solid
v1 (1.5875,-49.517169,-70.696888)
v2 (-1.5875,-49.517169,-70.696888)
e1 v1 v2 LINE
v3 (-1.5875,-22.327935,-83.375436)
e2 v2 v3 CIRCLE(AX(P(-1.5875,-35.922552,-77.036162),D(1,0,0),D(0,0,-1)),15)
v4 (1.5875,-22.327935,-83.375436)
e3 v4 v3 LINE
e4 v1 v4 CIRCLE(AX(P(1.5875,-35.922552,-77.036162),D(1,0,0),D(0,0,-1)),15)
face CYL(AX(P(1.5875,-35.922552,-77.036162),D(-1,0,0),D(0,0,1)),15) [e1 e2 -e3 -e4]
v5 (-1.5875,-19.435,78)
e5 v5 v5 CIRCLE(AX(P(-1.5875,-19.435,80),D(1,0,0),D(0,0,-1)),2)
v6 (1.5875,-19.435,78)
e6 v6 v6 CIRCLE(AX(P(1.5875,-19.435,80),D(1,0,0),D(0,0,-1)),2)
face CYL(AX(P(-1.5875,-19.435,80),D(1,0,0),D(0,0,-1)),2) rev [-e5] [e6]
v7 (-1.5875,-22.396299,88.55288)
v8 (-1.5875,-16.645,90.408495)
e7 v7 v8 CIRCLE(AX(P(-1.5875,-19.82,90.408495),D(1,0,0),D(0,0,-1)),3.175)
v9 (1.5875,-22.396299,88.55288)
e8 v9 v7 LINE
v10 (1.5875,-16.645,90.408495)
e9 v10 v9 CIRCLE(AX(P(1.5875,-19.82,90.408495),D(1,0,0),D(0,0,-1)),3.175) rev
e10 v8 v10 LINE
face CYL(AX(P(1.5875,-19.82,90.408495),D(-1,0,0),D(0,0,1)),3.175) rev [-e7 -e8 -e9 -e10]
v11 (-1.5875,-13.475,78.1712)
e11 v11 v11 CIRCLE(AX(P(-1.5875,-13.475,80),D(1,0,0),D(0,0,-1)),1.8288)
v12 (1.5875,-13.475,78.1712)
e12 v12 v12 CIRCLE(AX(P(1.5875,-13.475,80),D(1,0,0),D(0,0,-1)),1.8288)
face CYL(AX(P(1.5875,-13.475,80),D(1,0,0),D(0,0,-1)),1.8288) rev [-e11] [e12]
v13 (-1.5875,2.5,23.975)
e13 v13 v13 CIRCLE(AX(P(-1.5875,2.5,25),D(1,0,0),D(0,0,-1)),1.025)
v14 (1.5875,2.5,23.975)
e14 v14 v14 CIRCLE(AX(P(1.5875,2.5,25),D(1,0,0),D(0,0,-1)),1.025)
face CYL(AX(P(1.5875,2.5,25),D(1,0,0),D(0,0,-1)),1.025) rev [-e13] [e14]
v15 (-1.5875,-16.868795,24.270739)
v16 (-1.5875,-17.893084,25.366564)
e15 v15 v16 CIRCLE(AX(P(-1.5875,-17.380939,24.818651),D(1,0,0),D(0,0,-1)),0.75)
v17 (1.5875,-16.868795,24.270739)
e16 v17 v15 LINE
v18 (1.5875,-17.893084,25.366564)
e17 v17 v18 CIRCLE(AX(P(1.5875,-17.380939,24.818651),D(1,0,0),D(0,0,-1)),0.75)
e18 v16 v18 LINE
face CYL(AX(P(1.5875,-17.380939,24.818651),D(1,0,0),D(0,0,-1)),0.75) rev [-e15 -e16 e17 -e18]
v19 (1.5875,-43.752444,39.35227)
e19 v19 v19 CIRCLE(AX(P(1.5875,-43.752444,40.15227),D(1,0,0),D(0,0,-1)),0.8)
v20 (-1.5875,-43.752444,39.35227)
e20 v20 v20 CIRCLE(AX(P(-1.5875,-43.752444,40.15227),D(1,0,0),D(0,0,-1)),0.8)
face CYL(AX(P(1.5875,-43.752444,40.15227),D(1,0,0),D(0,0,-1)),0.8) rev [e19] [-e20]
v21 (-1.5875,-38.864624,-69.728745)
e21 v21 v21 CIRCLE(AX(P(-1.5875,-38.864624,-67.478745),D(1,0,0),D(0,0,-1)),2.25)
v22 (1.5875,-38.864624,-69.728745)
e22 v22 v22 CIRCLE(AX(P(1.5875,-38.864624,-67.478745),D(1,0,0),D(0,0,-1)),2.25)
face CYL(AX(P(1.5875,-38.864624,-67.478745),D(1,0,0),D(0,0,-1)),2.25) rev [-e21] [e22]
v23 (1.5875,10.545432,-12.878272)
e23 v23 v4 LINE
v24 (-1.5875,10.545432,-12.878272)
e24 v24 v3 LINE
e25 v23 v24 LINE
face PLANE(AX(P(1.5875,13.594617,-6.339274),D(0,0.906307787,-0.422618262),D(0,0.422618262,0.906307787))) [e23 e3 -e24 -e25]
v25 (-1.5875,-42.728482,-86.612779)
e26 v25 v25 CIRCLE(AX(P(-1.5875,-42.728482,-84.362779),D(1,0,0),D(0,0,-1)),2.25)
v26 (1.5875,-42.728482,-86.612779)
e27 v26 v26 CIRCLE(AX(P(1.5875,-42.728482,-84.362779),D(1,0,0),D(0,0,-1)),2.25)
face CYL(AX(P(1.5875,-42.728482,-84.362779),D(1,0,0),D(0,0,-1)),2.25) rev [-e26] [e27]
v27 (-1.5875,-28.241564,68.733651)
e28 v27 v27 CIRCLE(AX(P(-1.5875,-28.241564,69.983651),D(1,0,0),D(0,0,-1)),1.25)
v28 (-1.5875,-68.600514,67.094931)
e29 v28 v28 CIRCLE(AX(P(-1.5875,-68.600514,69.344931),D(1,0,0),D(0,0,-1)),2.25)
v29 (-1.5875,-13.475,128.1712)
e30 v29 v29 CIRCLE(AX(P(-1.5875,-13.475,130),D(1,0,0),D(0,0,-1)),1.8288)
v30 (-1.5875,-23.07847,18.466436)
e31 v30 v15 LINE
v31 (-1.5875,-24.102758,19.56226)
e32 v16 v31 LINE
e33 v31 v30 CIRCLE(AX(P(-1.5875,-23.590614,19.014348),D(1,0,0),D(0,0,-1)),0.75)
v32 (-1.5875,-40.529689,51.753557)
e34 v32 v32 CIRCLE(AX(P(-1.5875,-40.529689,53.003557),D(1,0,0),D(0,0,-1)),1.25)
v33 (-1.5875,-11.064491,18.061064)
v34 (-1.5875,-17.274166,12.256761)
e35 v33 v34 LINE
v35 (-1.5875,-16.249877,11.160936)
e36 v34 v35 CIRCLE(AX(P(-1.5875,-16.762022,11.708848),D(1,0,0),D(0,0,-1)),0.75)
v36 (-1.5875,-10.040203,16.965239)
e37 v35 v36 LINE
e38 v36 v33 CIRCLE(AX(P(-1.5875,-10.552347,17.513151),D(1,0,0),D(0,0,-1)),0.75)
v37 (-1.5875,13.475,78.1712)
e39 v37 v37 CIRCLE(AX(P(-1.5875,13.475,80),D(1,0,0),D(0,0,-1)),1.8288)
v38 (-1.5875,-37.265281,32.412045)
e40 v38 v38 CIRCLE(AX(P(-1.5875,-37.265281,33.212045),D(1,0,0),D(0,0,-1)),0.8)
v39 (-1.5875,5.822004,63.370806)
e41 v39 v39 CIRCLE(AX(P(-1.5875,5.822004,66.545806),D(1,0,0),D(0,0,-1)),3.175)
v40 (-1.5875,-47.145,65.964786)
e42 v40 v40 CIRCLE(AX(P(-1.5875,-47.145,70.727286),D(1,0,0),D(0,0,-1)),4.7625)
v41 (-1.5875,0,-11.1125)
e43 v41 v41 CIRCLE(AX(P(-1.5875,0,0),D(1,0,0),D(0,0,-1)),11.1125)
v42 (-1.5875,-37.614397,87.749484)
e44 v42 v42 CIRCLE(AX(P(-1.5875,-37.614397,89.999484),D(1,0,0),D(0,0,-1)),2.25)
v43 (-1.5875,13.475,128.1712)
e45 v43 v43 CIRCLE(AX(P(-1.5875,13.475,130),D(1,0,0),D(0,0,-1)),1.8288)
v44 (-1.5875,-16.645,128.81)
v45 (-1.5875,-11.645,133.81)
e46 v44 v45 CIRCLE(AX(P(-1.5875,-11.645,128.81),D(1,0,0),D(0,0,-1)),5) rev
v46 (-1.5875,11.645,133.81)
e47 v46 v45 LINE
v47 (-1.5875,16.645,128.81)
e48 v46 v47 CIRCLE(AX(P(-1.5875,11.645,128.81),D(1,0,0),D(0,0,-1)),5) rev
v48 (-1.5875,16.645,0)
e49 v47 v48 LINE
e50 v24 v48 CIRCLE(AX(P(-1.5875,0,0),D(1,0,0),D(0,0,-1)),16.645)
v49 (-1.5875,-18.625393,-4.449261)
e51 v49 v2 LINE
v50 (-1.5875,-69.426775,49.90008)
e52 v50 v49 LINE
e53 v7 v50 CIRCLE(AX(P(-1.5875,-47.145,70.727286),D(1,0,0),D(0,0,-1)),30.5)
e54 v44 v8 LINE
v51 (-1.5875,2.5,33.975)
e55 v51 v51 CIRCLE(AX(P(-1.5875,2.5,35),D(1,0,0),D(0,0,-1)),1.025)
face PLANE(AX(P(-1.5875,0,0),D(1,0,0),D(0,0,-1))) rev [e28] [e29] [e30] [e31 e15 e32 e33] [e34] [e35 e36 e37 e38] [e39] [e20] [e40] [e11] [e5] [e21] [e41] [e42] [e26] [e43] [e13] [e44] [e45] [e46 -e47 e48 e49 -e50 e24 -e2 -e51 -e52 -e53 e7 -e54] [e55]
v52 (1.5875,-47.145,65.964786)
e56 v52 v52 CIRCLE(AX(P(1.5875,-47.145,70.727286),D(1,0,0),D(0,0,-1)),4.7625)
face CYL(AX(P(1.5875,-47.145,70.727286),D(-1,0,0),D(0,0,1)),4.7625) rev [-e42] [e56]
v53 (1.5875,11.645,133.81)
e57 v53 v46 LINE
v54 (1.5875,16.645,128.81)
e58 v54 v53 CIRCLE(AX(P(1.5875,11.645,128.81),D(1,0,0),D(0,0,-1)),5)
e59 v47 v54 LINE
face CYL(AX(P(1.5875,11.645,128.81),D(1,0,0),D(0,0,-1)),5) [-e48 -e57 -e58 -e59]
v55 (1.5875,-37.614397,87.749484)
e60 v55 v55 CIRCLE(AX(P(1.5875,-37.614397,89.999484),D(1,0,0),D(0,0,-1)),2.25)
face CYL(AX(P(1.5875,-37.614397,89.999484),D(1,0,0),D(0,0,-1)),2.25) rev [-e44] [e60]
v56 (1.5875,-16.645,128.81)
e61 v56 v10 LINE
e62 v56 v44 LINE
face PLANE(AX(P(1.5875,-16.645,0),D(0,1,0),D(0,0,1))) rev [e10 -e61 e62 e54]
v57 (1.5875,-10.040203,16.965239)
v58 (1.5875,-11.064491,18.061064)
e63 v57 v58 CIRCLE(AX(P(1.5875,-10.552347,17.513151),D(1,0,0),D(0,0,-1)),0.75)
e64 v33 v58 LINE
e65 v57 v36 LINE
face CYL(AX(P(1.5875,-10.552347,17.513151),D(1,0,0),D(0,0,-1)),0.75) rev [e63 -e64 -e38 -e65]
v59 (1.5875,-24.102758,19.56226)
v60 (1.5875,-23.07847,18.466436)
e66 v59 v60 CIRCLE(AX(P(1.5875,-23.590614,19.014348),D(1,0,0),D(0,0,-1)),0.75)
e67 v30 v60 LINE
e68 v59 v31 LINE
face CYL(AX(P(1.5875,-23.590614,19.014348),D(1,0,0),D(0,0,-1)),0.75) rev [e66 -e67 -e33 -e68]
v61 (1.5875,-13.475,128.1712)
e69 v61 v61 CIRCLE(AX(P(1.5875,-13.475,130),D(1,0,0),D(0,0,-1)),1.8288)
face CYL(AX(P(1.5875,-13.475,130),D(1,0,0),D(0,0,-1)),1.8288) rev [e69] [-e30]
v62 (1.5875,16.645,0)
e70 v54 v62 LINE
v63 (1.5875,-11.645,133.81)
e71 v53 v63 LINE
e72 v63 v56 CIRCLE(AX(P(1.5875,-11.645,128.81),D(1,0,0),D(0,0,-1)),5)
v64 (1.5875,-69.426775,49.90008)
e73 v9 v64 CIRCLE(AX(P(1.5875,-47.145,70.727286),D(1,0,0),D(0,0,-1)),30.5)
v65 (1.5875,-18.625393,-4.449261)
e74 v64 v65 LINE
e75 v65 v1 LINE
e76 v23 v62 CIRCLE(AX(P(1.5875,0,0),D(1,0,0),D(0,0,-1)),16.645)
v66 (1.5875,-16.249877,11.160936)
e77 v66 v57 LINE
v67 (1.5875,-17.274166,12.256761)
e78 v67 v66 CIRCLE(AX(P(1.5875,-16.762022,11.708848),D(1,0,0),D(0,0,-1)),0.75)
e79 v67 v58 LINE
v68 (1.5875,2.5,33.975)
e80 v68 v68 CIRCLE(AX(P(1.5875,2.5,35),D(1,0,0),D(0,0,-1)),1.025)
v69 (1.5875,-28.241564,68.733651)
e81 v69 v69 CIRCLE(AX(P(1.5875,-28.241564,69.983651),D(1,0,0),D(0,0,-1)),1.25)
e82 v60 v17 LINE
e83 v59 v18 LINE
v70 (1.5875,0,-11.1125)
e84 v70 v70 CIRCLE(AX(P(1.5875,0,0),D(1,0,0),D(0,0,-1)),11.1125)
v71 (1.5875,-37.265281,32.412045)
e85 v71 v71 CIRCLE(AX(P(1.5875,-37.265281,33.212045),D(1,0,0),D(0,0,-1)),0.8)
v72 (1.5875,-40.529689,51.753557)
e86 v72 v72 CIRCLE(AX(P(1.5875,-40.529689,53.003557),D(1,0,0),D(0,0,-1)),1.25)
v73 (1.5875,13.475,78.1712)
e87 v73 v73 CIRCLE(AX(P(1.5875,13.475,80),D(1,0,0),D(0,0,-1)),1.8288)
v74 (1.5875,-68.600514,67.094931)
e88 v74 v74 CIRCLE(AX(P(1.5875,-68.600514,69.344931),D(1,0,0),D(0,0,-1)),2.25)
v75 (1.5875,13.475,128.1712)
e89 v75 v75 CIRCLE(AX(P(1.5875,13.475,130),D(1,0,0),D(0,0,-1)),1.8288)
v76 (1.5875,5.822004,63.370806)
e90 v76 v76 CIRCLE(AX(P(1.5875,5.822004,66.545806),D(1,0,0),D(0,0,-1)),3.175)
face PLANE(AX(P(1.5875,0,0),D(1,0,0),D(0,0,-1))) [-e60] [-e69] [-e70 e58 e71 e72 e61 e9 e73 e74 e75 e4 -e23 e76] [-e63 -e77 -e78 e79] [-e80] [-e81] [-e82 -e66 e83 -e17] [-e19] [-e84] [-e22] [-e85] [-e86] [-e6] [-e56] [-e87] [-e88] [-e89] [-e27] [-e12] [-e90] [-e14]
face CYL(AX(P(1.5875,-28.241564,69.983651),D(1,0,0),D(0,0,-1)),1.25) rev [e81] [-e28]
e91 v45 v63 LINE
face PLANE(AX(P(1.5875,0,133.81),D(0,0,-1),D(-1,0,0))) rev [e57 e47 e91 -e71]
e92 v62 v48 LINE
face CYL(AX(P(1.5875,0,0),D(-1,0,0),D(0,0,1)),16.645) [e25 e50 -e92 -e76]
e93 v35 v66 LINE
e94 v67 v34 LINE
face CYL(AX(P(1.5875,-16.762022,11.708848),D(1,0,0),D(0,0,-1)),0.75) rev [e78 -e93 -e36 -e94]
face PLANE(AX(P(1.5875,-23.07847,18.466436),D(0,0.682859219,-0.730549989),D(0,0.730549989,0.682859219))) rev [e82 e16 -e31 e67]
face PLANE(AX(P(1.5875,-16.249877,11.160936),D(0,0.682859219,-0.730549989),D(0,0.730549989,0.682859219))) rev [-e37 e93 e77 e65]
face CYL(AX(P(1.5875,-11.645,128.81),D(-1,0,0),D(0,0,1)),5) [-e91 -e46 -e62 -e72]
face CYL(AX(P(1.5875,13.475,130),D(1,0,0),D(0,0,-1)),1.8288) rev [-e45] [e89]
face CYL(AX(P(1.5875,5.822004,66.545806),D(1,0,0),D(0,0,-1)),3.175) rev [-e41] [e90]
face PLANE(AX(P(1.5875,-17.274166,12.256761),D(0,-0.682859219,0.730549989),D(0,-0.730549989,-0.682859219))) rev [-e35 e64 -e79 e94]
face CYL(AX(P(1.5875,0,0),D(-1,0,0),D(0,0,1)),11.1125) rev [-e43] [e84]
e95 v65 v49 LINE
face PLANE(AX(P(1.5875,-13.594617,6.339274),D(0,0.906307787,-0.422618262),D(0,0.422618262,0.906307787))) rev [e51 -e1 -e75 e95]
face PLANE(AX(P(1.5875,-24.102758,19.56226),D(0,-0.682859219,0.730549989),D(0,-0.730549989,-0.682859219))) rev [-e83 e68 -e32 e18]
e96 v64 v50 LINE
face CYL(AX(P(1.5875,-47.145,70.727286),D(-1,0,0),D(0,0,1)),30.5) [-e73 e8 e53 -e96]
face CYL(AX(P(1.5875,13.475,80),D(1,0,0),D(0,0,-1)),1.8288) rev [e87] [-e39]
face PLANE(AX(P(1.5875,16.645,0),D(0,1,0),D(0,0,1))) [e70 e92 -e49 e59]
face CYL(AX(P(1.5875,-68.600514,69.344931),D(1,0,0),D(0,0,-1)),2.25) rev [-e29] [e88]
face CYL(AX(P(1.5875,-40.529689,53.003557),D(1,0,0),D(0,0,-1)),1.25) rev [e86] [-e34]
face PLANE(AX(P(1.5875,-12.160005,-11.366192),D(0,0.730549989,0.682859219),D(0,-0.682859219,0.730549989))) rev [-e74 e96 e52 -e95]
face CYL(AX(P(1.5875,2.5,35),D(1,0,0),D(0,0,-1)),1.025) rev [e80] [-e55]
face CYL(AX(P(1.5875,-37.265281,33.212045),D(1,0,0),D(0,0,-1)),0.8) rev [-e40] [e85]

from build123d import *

# Parameters (mm, degrees)
SKETCH1_R                  = 4.7625
SKETCH1_R_2                = 11.1125
BOSS_EXTRUDE1_DEPTH        = 1.5875
SKETCH12_R                 = 11.1125
BOSS_EXTRUDE2_DEPTH        = 1.5875
F_6_CLEARANCE_HOLE1_D      = 3.6576
M3X0_5_TAPPED_HOLE1_D      = 2.5
M4_CLEARANCE_HOLE1_D       = 4.5
M2X0_4_TAPPED_HOLE1_D      = 1.6
FILLET1_R                  = 5
FILLET2_R                  = 3.175
CUT_EXTRUDE1_DEPTH         = 155.713872435
CUT_EXTRUDE1_DEPTH_BACK    = 155.713872435
SKETCH1_3_R                = 2
F_1_4_0_2500_DOWEL_HOLE1_D = 6.35
F_1_5MM_START              = -1.5875
F_1_5MM_DOWEL_SLOT1_DEPTH  = 3.175
M2_5X0_45_TAPPED_HOLE1_D   = 2.05


# Read off the part's stored shape, not the designer's step: Ø1.5mm Dowel Slot1
with BuildPart() as part:
    # Sketch1 → Boss-Extrude1 (new, symmetric)
    with BuildSketch(Plane(origin=(0, 0, 0), x_dir=(0, 0, -1), z_dir=(1, 0, 0))):
        with BuildLine():
            ThreePointArc((-83.281063832, -19.348369622), (-96.105900293, -64.061735294), (-49.900079745, -69.426774672))
            Line((-49.900079745, -69.426774672), (11.366191703, -12.160004571))
            ThreePointArc((11.366191703, -12.160004571), (15.483205435, 6.109531443), (0, 16.645))
            Line((0, 16.645), (-133.81, 16.645))
            Line((-133.81, 16.645), (-133.81, -16.645))
            Line((-133.81, -16.645), (-77.295250897, -16.645))
            Line((-77.295250897, -16.645), (-83.281063832, -19.348369622))
        make_face()
        with Locations((-70.72728593, -47.145)):
            Circle(SKETCH1_R, mode=Mode.SUBTRACT)
        Circle(SKETCH1_R_2, mode=Mode.SUBTRACT)
    extrude(amount=BOSS_EXTRUDE1_DEPTH, both=True)

    # Sketch12 → Boss-Extrude2 (add, symmetric)
    with BuildSketch(Plane(origin=(0, 0, 0), x_dir=(0, 0, -1), z_dir=(1, 0, 0))):
        with BuildLine():
            Line((83.375435824, -22.327935442), (6.339273926, 13.594616806))
            ThreePointArc((6.339273926, 13.594616806), (-13.594616806, 6.339273926), (-6.339273926, -13.594616806))
            Line((-6.339273926, -13.594616806), (70.696887972, -49.517169054))
            ThreePointArc((70.696887972, -49.517169054), (90.630778704, -42.261826174), (83.375435824, -22.327935442))
        make_face()
        Circle(SKETCH12_R, mode=Mode.SUBTRACT)
    extrude(amount=BOSS_EXTRUDE2_DEPTH, both=True)

    # #6 Clearance Hole1 (through all)
    with Locations(Plane(origin=(1.5875, 0, 0), x_dir=(0, 0, -1), z_dir=(1, 0, 0))):
        with Locations((-80, -13.475), (-80, 13.475), (-130, 13.475), (-130, -13.475)):
            Hole(F_6_CLEARANCE_HOLE1_D / 2)

    # M3x0.5 Tapped Hole1 (through all)
    with Locations(Plane(origin=(1.5875, 0, 0), x_dir=(0, 0, -1), z_dir=(1, 0, 0))):
        with Locations((-53.003557214, -40.529688942), (-69.983650742, -28.241563627)):
            Hole(M3X0_5_TAPPED_HOLE1_D / 2)

    # M4 Clearance Hole1 (through all)
    with Locations(Plane(origin=(1.5875, 0, 0), x_dir=(0, 0, -1), z_dir=(1, 0, 0))):
        with Locations((84.362778856, -42.728482305), (-69.34493086, -68.600514314), (-89.999483912, -37.614397451), (67.478745093, -38.864623629)):
            Hole(M4_CLEARANCE_HOLE1_D / 2)

    # M2x0.4 Tapped Hole1 (through all)
    with Locations(Plane(origin=(1.5875, 0, 0), x_dir=(0, 0, -1), z_dir=(1, 0, 0))):
        with Locations((-33.212044815, -37.265281486), (-40.152269713, -43.752444068)):
            Hole(M2X0_4_TAPPED_HOLE1_D / 2)

    # Fillet1
    fillet1_edges = [part.edges().sort_by_distance(p)[0] for p in [
        (0, -16.645, 133.81),
        (0, 16.645, 133.81),
    ]]
    fillet(fillet1_edges, radius=FILLET1_R)

    # Fillet2
    fillet2_edges = [part.edges().sort_by_distance(p)[0] for p in [
        (0, -16.645, 77.295250897),
    ]]
    fillet(fillet2_edges, radius=FILLET2_R)

    # Sketch1<3> → Cut-Extrude1 (cut, two sides: drawn at the far end of the back side and taken through both)
    with BuildSketch(Plane(origin=(0, 0, 0), x_dir=(0, 0, -1), z_dir=(1, 0, 0)).offset(-CUT_EXTRUDE1_DEPTH_BACK)):
        with Locations((-80, -19.435)):
            Circle(SKETCH1_3_R)
    extrude(amount=CUT_EXTRUDE1_DEPTH + CUT_EXTRUDE1_DEPTH_BACK, mode=Mode.SUBTRACT)

    # 1/4 (0.2500) Dowel Hole1 (through all)
    with Locations(Plane(origin=(1.5875, 0, 0), x_dir=(0, 0, -1), z_dir=(1, 0, 0))):
        with Locations((-66.545805833, 5.822003616)):
            Hole(F_1_4_0_2500_DOWEL_HOLE1_D / 2)

    # Ø1.5mm Dowel Slot1 outline → Ø1.5mm Dowel Slot1 (cut)
    with BuildSketch(Plane.YZ.offset(F_1_5MM_START)):
        with BuildLine():
            Line((-16.249877423, 11.160935612), (-10.040202515, 16.965238975))
            ThreePointArc((-10.040202515, 16.965238975), (-10.004434437, 18.025295881), (-11.064491343, 18.061063959))
            Line((-11.064491343, 18.061063959), (-17.274166252, 12.256760596))
            ThreePointArc((-17.274166252, 12.256760596), (-17.30993433, 11.196703689), (-16.249877423, 11.160935612))
        make_face()
        with BuildLine():
            Line((-23.078469615, 18.466435504), (-16.868794706, 24.270738867))
            ThreePointArc((-16.868794706, 24.270738867), (-16.833026629, 25.330795773), (-17.893083535, 25.366563851))
            Line((-17.893083535, 25.366563851), (-24.102758444, 19.562260488))
            ThreePointArc((-24.102758444, 19.562260488), (-24.138526521, 18.502203582), (-23.078469615, 18.466435504))
        make_face()
    extrude(amount=F_1_5MM_DOWEL_SLOT1_DEPTH, mode=Mode.SUBTRACT)

    # M2.5x0.45 Tapped Hole1 (through all)
    with Locations(Plane(origin=(1.5875, 0, 0), x_dir=(0, 0, -1), z_dir=(1, 0, 0))):
        with Locations((-35, 2.5), (-25, 2.5)):
            Hole(M2_5X0_45_TAPPED_HOLE1_D / 2)


solid = part.part
